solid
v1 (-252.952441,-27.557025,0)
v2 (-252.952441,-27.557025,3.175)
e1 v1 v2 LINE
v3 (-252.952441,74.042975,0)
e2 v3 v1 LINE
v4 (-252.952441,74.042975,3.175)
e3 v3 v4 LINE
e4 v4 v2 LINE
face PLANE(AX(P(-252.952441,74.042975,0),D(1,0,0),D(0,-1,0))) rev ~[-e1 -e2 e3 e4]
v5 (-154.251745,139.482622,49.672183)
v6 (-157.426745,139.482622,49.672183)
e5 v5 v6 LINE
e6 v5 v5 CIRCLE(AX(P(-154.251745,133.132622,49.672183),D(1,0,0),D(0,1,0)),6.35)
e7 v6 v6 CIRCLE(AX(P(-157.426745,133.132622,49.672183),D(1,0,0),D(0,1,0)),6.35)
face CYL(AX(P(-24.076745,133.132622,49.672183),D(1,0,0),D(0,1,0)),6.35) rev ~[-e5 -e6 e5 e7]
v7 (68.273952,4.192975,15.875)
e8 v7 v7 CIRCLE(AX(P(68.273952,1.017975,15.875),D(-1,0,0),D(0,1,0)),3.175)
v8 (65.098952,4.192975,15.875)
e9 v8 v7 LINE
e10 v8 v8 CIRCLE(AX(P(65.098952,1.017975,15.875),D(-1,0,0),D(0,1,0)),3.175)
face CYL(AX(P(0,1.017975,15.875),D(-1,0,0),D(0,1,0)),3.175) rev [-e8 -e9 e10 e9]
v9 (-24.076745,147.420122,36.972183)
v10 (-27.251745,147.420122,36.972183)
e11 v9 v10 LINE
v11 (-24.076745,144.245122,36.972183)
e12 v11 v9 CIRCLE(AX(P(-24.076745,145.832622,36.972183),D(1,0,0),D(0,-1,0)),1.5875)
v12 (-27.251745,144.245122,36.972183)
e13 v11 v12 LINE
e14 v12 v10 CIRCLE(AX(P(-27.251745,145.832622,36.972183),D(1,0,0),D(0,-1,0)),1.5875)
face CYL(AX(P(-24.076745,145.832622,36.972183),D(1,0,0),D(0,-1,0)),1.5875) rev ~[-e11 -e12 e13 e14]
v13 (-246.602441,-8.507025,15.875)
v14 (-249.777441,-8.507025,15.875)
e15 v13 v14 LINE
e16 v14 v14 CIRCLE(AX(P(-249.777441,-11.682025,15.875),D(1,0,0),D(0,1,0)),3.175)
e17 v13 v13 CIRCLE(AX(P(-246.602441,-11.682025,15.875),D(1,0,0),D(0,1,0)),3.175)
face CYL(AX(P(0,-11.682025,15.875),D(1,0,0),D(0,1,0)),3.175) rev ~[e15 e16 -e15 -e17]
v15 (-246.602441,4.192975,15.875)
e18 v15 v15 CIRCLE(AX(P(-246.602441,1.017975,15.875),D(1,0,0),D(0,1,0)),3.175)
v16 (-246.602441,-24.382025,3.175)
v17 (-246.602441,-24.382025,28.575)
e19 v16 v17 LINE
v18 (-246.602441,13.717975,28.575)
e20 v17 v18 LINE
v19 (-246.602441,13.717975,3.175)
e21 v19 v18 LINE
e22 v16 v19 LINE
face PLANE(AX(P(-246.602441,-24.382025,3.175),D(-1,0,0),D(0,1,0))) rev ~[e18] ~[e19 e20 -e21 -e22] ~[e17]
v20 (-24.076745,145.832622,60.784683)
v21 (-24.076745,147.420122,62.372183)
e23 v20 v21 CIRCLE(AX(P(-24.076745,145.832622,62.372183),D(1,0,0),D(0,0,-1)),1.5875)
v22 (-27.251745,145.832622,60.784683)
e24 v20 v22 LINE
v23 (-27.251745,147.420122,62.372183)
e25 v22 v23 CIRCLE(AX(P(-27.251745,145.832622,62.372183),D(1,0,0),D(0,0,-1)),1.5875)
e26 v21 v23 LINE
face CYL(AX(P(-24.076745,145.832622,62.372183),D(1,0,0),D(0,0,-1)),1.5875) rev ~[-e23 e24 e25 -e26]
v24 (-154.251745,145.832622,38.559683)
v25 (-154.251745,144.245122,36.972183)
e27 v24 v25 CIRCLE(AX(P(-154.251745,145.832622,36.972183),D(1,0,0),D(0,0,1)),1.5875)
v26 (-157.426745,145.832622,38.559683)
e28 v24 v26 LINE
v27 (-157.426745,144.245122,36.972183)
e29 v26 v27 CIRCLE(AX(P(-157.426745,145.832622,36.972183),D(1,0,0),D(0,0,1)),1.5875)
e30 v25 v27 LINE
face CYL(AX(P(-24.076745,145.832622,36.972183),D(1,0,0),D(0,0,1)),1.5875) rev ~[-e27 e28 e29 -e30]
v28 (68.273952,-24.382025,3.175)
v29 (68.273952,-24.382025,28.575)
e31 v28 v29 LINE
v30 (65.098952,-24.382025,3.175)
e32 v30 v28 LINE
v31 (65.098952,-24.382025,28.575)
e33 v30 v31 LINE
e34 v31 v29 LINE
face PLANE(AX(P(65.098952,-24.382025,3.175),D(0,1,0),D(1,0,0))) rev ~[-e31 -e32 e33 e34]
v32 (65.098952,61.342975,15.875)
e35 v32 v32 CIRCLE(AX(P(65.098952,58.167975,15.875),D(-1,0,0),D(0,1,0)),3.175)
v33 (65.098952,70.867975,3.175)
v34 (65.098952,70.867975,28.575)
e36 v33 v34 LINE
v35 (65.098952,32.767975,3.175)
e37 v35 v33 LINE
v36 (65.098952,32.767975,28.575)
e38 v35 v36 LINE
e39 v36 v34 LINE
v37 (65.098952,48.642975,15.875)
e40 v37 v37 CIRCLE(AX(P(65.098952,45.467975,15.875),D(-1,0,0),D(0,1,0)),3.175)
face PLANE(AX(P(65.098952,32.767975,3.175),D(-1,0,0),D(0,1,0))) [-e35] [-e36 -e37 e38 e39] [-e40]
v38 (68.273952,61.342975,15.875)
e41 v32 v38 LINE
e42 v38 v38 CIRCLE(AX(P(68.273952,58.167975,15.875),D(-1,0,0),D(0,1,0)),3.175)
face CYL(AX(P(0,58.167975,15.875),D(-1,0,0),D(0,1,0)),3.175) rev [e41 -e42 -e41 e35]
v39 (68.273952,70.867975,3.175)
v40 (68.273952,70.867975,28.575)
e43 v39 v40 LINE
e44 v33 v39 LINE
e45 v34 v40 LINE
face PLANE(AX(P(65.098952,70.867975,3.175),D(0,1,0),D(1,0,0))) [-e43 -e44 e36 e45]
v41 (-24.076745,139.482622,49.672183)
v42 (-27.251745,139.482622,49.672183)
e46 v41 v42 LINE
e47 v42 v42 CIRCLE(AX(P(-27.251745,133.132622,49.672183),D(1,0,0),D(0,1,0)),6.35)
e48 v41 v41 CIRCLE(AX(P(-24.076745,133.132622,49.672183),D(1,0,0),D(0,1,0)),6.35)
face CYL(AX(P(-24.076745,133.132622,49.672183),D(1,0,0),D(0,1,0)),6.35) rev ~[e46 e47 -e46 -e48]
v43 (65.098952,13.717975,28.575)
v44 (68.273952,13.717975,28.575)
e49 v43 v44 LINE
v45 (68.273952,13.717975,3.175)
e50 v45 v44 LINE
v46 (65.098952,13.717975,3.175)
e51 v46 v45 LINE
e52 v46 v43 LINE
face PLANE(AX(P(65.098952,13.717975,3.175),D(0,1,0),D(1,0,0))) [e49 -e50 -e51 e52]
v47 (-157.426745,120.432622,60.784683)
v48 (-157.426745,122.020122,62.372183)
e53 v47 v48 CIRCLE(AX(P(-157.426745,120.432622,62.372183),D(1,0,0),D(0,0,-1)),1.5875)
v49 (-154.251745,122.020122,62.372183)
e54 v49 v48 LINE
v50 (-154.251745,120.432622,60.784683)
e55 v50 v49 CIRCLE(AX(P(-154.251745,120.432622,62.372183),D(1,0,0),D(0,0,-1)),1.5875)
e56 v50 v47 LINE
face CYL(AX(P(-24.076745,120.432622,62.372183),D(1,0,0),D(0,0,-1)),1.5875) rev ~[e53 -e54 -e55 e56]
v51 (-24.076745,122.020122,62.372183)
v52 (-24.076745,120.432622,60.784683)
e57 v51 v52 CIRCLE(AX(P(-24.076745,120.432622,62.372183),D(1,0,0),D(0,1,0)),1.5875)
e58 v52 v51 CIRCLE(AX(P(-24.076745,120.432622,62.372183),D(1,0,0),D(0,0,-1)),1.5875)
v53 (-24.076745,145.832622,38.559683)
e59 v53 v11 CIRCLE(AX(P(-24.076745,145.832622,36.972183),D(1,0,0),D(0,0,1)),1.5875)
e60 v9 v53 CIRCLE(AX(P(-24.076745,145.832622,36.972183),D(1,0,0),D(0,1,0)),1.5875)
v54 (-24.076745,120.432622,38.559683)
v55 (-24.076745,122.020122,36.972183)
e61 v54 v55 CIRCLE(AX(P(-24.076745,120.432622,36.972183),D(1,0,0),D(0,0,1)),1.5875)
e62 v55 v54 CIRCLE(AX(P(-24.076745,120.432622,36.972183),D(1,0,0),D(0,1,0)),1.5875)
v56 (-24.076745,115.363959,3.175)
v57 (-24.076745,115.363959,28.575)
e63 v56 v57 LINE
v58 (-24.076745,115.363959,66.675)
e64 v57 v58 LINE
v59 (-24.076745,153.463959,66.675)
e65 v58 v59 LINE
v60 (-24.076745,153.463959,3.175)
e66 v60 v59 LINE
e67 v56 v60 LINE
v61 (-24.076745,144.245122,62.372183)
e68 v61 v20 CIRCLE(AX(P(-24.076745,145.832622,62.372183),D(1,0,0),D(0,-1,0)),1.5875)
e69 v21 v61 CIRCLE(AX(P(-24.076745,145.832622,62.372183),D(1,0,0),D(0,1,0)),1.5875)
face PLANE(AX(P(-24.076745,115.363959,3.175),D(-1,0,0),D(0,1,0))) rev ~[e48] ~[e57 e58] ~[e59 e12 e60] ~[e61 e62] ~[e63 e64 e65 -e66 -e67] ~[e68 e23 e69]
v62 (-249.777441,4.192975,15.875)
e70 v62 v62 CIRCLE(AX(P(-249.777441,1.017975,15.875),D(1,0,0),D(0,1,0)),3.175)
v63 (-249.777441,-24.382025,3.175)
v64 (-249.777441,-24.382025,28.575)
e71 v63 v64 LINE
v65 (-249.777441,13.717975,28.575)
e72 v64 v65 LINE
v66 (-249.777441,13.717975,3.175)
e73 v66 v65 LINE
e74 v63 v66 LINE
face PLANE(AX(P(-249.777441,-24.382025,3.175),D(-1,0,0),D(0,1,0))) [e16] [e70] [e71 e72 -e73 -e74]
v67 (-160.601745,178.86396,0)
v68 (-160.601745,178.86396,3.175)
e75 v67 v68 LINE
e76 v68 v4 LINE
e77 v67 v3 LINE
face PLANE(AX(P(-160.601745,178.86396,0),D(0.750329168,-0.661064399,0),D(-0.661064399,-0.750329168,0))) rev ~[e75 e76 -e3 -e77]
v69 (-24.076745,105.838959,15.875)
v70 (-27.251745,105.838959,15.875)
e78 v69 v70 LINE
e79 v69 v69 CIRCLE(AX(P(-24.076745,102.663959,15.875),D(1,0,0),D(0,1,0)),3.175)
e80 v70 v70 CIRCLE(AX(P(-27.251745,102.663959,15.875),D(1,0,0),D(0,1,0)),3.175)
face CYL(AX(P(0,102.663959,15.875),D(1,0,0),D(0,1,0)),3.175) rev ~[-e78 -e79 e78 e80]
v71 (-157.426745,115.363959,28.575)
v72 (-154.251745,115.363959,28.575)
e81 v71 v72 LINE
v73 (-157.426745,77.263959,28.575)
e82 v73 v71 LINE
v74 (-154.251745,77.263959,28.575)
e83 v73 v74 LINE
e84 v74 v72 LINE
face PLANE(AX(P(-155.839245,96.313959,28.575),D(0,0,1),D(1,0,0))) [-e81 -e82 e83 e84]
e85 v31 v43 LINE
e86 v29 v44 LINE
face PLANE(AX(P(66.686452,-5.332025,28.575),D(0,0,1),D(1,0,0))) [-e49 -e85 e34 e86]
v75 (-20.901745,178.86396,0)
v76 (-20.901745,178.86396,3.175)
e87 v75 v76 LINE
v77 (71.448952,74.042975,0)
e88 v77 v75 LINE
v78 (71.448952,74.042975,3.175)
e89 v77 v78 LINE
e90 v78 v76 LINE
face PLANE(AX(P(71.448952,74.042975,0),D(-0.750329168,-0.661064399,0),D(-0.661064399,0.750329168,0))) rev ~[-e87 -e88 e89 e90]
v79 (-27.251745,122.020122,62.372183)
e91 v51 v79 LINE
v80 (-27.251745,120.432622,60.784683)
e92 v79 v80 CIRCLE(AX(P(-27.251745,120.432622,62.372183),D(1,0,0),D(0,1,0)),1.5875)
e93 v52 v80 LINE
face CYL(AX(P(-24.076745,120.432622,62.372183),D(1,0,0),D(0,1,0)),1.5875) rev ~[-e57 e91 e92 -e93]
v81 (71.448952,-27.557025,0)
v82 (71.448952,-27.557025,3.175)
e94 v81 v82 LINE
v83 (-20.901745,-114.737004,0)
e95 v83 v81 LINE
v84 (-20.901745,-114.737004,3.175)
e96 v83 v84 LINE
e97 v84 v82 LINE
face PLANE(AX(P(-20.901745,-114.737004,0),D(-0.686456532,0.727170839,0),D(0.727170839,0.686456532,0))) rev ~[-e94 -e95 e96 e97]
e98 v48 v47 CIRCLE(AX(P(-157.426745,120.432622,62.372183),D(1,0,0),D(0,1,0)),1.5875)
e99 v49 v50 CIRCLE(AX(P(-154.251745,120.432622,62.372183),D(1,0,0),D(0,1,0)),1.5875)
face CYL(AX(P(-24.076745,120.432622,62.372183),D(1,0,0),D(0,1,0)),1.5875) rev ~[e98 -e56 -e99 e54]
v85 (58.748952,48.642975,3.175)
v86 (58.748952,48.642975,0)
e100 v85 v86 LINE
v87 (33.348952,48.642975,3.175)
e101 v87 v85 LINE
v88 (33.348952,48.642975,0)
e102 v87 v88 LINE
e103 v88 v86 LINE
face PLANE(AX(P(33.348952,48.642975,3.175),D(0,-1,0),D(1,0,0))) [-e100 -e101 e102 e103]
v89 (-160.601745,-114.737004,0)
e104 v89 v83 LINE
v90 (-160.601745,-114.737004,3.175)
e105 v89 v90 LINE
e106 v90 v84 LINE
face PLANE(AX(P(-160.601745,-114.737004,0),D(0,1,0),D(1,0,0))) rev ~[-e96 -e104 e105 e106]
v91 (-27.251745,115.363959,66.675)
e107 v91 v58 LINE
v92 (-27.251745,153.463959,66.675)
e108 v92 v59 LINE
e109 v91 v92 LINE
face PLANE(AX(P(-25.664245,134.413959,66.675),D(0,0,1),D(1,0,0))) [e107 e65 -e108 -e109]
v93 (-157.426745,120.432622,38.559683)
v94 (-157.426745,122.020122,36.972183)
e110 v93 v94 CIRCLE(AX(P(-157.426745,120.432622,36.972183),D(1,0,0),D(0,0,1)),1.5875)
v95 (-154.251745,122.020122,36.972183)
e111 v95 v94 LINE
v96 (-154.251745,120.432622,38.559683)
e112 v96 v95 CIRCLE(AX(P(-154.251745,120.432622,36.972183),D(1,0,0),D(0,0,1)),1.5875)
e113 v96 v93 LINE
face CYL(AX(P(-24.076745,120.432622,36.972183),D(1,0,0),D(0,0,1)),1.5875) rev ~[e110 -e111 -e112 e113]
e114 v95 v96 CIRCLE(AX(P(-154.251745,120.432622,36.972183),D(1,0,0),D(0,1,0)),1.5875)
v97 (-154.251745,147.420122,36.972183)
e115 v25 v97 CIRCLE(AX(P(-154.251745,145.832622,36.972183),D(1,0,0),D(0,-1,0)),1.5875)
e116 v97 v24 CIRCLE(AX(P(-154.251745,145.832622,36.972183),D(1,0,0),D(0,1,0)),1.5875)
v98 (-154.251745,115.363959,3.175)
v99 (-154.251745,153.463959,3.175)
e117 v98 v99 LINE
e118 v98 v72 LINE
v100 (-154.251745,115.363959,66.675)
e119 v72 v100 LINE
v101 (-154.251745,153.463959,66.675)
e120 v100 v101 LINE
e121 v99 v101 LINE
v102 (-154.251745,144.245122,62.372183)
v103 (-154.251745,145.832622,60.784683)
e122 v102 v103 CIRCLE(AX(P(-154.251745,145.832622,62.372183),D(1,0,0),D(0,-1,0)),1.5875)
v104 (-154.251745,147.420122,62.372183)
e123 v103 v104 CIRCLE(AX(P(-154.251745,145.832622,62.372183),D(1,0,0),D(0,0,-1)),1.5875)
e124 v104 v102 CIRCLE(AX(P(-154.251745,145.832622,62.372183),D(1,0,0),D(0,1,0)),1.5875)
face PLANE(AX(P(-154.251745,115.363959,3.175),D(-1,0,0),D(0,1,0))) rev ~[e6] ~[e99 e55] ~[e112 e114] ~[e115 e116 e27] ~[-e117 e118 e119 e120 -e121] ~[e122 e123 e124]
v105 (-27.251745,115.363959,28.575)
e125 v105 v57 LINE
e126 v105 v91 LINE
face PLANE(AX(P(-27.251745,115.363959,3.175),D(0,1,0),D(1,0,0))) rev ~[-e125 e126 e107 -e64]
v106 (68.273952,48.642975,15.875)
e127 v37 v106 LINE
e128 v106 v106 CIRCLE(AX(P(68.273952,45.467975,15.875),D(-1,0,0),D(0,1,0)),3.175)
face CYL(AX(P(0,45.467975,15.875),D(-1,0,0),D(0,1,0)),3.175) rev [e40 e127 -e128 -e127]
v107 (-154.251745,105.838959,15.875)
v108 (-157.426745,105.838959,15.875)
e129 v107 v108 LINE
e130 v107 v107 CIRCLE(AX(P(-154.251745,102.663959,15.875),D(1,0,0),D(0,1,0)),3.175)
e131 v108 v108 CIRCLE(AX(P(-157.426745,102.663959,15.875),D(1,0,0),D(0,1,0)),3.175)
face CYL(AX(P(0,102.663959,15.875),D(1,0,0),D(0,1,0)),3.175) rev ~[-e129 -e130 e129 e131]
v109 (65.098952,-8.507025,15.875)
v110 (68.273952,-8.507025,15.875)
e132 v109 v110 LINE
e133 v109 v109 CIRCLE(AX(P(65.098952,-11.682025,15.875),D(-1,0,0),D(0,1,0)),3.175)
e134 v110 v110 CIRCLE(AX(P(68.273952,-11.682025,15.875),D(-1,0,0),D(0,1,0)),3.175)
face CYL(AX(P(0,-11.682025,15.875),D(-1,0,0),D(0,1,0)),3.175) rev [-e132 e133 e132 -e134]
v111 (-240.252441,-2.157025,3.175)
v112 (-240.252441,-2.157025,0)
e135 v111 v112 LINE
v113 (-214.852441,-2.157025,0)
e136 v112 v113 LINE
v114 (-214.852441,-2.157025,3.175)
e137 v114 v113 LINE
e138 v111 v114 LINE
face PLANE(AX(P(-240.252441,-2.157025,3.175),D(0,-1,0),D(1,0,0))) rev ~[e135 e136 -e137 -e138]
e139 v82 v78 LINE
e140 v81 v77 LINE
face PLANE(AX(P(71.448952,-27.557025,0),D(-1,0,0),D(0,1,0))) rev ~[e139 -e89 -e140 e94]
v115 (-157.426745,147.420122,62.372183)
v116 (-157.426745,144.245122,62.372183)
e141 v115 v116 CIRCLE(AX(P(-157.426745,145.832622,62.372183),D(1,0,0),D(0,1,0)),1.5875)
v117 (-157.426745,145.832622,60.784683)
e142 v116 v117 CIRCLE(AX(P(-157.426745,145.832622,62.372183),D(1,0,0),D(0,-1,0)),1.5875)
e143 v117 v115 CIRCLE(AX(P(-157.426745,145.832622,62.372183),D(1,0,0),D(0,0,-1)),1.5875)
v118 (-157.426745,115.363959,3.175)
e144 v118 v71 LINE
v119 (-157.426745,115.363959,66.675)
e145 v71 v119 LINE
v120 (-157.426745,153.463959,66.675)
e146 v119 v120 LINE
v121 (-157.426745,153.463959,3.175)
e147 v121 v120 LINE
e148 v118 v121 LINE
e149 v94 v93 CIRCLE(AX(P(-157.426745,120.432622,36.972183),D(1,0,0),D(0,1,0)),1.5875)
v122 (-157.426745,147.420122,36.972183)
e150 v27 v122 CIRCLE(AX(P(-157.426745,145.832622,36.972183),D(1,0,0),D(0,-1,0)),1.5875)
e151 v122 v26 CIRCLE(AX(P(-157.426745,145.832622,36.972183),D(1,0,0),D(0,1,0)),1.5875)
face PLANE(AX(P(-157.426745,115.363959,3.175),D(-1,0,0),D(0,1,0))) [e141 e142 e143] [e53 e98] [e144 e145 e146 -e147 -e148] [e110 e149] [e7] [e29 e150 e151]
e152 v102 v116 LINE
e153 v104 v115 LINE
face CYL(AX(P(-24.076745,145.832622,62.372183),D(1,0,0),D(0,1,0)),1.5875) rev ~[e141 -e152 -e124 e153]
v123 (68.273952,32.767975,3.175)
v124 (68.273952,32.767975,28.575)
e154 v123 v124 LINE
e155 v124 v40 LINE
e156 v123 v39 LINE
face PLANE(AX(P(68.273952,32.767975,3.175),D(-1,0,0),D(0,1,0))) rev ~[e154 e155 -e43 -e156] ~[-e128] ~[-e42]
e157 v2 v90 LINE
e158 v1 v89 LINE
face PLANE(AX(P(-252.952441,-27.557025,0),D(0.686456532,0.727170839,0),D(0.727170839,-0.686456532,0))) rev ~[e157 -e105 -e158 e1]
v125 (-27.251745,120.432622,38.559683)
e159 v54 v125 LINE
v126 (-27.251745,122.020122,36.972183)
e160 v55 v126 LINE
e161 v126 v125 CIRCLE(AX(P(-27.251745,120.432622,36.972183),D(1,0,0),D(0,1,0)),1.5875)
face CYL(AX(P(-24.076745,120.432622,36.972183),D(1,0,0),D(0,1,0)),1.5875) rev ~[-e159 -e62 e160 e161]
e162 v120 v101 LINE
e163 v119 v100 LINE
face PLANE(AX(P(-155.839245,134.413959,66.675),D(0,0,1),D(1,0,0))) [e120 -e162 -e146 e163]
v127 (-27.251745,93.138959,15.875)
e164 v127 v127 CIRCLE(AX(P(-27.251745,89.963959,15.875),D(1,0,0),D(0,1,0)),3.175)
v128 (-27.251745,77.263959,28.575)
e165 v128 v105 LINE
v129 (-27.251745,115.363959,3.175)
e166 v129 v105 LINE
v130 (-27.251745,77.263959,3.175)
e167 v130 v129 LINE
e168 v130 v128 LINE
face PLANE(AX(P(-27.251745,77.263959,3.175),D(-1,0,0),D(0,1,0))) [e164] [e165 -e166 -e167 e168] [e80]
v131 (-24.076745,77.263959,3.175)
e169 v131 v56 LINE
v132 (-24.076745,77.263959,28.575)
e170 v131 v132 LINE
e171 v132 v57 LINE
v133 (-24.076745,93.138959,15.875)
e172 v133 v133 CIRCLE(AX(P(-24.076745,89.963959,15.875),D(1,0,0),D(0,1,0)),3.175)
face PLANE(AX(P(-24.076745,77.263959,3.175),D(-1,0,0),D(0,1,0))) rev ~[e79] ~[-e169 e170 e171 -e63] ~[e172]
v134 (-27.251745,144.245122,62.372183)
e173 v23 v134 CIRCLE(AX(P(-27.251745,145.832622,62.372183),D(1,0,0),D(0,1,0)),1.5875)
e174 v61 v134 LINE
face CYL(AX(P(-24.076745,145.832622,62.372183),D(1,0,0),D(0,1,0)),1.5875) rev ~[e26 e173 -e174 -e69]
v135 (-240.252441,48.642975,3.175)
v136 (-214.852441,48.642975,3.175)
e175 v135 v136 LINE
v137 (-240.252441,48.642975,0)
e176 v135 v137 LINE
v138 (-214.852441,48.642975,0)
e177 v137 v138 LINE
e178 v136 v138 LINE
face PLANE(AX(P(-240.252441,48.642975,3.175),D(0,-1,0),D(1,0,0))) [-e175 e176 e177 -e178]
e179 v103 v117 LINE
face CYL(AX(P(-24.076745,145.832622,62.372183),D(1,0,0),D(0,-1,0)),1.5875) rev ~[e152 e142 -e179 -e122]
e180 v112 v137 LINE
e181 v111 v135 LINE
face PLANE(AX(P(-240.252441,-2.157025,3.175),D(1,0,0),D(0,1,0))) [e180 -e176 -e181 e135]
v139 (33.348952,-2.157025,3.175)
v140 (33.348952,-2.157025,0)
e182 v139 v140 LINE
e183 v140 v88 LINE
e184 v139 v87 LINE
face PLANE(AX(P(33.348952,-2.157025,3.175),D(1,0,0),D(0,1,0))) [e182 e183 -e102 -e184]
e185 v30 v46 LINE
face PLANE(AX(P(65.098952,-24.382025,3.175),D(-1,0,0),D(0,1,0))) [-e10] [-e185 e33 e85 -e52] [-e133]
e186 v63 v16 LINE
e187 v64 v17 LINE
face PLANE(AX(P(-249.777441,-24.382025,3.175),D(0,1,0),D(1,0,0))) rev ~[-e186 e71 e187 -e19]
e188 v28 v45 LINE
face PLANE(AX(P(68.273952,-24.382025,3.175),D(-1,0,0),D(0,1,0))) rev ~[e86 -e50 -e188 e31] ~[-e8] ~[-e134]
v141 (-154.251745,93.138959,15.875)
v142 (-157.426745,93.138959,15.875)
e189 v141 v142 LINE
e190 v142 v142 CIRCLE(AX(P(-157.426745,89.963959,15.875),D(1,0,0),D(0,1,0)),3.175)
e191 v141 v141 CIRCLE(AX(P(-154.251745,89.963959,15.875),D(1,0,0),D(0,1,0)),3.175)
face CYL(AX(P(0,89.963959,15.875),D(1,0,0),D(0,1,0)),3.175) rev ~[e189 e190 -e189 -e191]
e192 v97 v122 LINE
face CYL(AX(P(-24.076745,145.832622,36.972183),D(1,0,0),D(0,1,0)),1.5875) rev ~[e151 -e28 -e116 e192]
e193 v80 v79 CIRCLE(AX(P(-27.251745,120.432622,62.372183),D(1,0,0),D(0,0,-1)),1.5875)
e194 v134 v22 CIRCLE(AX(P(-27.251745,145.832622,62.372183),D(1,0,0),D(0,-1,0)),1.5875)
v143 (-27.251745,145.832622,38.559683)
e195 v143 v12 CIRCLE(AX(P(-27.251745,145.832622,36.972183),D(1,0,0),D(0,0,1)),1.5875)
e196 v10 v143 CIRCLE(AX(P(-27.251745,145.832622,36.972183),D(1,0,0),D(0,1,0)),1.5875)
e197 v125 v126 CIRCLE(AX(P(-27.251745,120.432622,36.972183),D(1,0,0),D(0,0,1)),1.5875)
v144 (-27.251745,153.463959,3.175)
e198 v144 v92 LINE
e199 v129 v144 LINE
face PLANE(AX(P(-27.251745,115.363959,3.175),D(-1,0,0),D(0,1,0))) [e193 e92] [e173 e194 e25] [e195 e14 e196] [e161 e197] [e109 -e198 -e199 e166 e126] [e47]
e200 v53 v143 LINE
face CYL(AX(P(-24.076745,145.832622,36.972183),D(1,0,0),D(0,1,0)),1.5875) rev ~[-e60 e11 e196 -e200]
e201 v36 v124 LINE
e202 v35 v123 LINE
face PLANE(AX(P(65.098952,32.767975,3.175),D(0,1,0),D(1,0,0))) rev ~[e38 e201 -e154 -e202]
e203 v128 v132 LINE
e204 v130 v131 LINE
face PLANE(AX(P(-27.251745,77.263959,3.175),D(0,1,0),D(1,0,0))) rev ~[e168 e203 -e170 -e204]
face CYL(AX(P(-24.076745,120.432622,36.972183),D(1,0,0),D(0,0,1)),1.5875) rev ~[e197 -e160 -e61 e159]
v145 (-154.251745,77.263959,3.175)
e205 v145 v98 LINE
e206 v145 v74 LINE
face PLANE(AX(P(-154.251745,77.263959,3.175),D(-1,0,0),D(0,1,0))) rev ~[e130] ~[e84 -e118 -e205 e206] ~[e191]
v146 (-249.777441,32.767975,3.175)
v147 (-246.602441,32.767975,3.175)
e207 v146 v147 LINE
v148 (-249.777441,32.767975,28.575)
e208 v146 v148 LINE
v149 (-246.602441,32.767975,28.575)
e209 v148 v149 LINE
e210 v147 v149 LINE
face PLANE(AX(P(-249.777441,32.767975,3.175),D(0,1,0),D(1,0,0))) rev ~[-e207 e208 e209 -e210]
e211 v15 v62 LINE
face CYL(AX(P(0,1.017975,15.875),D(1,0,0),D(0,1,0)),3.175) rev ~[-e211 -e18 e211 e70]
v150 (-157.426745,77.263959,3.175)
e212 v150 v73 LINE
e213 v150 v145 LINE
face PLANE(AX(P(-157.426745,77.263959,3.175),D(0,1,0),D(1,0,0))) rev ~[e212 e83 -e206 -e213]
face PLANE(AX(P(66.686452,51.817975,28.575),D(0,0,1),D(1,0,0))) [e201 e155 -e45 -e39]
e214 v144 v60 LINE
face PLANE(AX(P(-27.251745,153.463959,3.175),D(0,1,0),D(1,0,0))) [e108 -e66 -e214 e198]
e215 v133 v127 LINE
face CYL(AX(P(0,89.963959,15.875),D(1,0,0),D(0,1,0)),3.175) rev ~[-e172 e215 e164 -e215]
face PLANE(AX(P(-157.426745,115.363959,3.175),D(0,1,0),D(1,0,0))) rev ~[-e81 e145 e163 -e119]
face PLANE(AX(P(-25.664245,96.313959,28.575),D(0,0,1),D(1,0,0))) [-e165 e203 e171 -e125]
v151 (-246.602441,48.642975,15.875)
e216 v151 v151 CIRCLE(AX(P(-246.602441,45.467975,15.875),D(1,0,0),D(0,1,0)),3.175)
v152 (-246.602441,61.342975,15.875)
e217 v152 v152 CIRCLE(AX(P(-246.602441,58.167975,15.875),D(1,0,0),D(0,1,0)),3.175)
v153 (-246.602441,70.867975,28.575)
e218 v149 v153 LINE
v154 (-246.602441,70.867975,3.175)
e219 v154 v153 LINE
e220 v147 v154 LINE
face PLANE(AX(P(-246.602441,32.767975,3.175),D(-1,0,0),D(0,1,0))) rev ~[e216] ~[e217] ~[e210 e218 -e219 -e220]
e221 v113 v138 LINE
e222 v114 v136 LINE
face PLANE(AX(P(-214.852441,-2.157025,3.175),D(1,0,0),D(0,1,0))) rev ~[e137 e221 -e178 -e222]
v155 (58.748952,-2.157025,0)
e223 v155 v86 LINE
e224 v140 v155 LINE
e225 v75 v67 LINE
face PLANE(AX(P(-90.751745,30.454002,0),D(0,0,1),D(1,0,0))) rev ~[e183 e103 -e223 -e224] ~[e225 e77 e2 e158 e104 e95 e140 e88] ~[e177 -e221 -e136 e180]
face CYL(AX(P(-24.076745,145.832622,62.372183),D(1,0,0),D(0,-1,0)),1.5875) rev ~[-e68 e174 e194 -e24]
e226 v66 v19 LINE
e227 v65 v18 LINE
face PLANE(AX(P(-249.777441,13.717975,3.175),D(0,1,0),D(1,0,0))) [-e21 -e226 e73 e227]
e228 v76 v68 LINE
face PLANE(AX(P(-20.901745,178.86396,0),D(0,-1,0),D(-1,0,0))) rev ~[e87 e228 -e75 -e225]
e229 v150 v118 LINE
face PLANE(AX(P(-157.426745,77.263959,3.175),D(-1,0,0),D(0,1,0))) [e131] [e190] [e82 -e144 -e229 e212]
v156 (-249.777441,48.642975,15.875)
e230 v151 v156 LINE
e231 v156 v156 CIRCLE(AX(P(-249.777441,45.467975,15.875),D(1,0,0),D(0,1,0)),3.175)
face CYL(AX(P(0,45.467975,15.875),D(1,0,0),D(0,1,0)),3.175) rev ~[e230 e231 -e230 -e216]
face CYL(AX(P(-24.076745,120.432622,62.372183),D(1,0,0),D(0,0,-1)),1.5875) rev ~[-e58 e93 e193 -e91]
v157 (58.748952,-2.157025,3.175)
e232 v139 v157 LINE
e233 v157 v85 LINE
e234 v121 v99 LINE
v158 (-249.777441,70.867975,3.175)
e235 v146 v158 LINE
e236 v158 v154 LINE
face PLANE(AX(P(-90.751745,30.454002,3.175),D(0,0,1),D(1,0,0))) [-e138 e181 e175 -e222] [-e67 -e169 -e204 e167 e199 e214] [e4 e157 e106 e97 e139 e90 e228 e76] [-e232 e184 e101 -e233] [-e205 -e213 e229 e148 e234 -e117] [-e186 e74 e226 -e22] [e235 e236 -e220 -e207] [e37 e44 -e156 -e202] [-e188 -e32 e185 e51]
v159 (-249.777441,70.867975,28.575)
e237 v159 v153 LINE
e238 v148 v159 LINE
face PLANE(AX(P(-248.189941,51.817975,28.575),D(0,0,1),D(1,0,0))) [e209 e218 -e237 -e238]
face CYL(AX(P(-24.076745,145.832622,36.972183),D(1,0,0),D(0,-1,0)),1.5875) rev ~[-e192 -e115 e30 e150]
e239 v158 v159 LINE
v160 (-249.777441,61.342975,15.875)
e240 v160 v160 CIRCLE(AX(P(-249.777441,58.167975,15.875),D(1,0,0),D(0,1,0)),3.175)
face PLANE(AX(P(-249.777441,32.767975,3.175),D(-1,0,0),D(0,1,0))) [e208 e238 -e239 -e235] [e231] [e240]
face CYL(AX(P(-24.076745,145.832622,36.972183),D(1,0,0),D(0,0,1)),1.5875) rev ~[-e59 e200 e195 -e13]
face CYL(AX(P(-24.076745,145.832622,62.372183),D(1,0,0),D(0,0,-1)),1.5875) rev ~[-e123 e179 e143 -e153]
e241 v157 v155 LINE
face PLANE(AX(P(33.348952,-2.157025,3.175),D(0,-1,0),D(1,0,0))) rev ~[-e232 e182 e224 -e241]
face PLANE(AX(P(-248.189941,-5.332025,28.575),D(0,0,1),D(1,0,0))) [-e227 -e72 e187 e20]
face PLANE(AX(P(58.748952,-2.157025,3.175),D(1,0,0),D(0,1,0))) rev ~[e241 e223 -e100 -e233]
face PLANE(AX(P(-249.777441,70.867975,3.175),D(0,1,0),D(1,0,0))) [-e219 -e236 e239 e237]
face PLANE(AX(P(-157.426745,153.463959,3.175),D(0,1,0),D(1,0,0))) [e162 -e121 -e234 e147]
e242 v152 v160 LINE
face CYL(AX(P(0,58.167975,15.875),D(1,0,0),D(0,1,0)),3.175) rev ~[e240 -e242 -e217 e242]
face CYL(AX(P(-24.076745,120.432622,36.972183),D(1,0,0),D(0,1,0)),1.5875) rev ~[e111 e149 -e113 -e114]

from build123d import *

# Parameters (mm, degrees)
F1_DEPTH  = 3.175
F2_W      = 3.175
F2_H      = 38.1
F3_DEPTH  = 25.4
F4_R      = 3.175
F5_DEPTH  = 381
F2_W_2    = 25.4
F2_H_2    = 50.8
F6_DEPTH  = 25.4
F7_DEPTH  = 63.5
F8_R      = 6.35
F9_DEPTH  = 177.8
F11_DEPTH = 304.8
F12_DEPTH = 25.4
F13_DEPTH = 254


# Not quite as in the source:
# - ends of sketch curves that miss each other by under 0.0002 mm in the source are joined
# - a feature names something its author has since deleted; it is built from what else it names


with BuildPart() as f1:
    # F0 (on Top) → F1 (new body)
    with BuildSketch(Plane.XY):
        Polygon((-252.9524413709, 74.0429753427), (-252.9524413709, -27.5570246573), (-160.6017448068, -114.7370042634), (-20.9017448068, -114.7370042634), (71.4489517573, -27.5570246573), (71.4489517573, 74.0429753427), (-20.9017448068, 178.8639600935), (-160.6017448068, 178.8639600935), align=None)
    extrude(amount=F1_DEPTH)

    # F2 (on face) → F3 (join)
    with BuildSketch(Plane.XY.offset(3.175)):
        with Locations((-248.1899413709, 51.8179753427)):
            Rectangle(F2_W, F2_H)
        with Locations((-248.1899413709, -5.3320246573)):
            Rectangle(F2_W, F2_H)
        with Locations((-155.8392448068, 96.3139587522)):
            Rectangle(F2_W, F2_H)
        with Locations((-25.6642448068, 96.3139587522)):
            Rectangle(F2_W, F2_H)
        with Locations((66.6864517573, 51.8179753427)):
            Rectangle(F2_W, F2_H)
        with Locations((66.6864517573, -5.3320246573)):
            Rectangle(F2_W, F2_H)
    extrude(amount=F3_DEPTH)

    # F4 (on Right) → F5 (cut, symmetric)
    with BuildSketch(Plane.YZ):
        with Locations((-11.6820246573, 15.875)):
            Circle(F4_R)
        with Locations((1.0179753427, 15.875)):
            Circle(F4_R)
        with Locations((45.4679753427, 15.875)):
            Circle(F4_R)
        with Locations((58.1679753427, 15.875)):
            Circle(F4_R)
        with Locations((89.9639587522, 15.875)):
            Circle(F4_R)
        with Locations((102.6639587522, 15.875)):
            Circle(F4_R)
    extrude(amount=F5_DEPTH, both=True, mode=Mode.SUBTRACT)

    # F2 (on face) → F6 (cut)
    with BuildSketch(Plane.XY.offset(3.175)):
        with Locations((-227.5524413709, 23.2429753427)):
            Rectangle(F2_W_2, F2_H_2)
        with Locations((46.0489517573, 23.2429753427)):
            Rectangle(F2_W_2, F2_H_2)
    extrude(amount=-F6_DEPTH, mode=Mode.SUBTRACT)

    # F2 (on face) → F7 (join)
    with BuildSketch(Plane.XY.offset(3.175)):
        with Locations((-155.8392446995, 134.4139587522)):
            Rectangle(F2_W, F2_H)
        with Locations((-25.6642446429, 134.4139587522)):
            Rectangle(F2_W, F2_H)
    extrude(amount=F7_DEPTH)

    # F8 (on face) + F4 (on Right) → F9 (cut, symmetric)
    with BuildSketch(Plane.YZ.offset(-24.0767446429)):
        with Locations((133.1326216459, 49.6721826494)):
            Circle(F8_R)
    with BuildSketch(Plane.YZ):
        with Locations((89.9639587522, 15.875)):
            Circle(F4_R)
        with Locations((102.6639587522, 15.875)):
            Circle(F4_R)
    extrude(amount=F9_DEPTH, both=True, mode=Mode.SUBTRACT)

    # F10 (on face) → F11 (cut)
    with BuildSketch(Plane.YZ.offset(-24.0767446429)):
        with BuildLine():
            ThreePointArc((122.0201216459, 62.3721826494), (119.3100896308, 63.4947146645), (120.4326216459, 60.7846826494))
            Line((120.4326216459, 60.7846826494), (120.4326216459, 62.3721826494))
            Line((120.4326216459, 62.3721826494), (122.0201216459, 62.3721826494))
        make_face()
        with BuildLine():
            Line((145.8326216459, 62.3721826494), (145.8326216459, 60.7846826494))
            ThreePointArc((145.8326216459, 60.7846826494), (146.9551536611, 61.2496506342), (147.4201216459, 62.3721826494))
            ThreePointArc((147.4201216459, 62.3721826494), (145.8326216459, 63.9596826494), (144.2451216459, 62.3721826494))
            Line((144.2451216459, 62.3721826494), (145.8326216459, 62.3721826494))
        make_face()
        with BuildLine():
            Line((145.8326216459, 36.9721826494), (144.2451216459, 36.9721826494))
            ThreePointArc((144.2451216459, 36.9721826494), (145.8326216459, 35.3846826494), (147.4201216459, 36.9721826494))
            ThreePointArc((147.4201216459, 36.9721826494), (146.9551536611, 38.0947146645), (145.8326216459, 38.5596826494))
            Line((145.8326216459, 38.5596826494), (145.8326216459, 36.9721826494))
        make_face()
        with BuildLine():
            ThreePointArc((120.4326216459, 38.5596826494), (119.3100896308, 35.8496506342), (122.0201216459, 36.9721826494))
            Line((122.0201216459, 36.9721826494), (120.4326216459, 36.9721826494))
            Line((120.4326216459, 36.9721826494), (120.4326216459, 38.5596826494))
        make_face()
        with BuildLine():
            Line((120.4326216459, 36.9721826494), (122.0201216459, 36.9721826494))
            ThreePointArc((122.0201216459, 36.9721826494), (121.5551536611, 38.0947146645), (120.4326216459, 38.5596826494))
            Line((120.4326216459, 38.5596826494), (120.4326216459, 36.9721826494))
        make_face()
        with BuildLine():
            Line((120.4326216459, 62.3721826494), (120.4326216459, 60.7846826494))
            ThreePointArc((120.4326216459, 60.7846826494), (121.5551536611, 61.2496506342), (122.0201216459, 62.3721826494))
            Line((122.0201216459, 62.3721826494), (120.4326216459, 62.3721826494))
        make_face()
        with BuildLine():
            ThreePointArc((144.2451216459, 62.3721826494), (144.7100896308, 61.2496506342), (145.8326216459, 60.7846826494))
            Line((145.8326216459, 60.7846826494), (145.8326216459, 62.3721826494))
            Line((145.8326216459, 62.3721826494), (144.2451216459, 62.3721826494))
        make_face()
        with BuildLine():
            ThreePointArc((145.8326216459, 38.5596826494), (144.7100896308, 38.0947146645), (144.2451216459, 36.9721826494))
            Line((144.2451216459, 36.9721826494), (145.8326216459, 36.9721826494))
            Line((145.8326216459, 36.9721826494), (145.8326216459, 38.5596826494))
        make_face()
    extrude(amount=-F11_DEPTH, mode=Mode.SUBTRACT)

    # F2 (on face) → F12 (join)
    with BuildSketch(Plane.XY.offset(3.175)):
        with Locations((-25.6642448068, 96.3139587522)):
            Rectangle(F2_W, F2_H)
        with Locations((-155.8392448068, 96.3139587522)):
            Rectangle(F2_W, F2_H)
    extrude(amount=F12_DEPTH)

    # F4 (on Right) → F13 (cut)
    with BuildSketch(Plane.YZ):
        with Locations((102.6639587522, 15.875)):
            Circle(F4_R)
        with Locations((89.9639587522, 15.875)):
            Circle(F4_R)
    extrude(amount=-F13_DEPTH, mode=Mode.SUBTRACT)


solid = f1.part
